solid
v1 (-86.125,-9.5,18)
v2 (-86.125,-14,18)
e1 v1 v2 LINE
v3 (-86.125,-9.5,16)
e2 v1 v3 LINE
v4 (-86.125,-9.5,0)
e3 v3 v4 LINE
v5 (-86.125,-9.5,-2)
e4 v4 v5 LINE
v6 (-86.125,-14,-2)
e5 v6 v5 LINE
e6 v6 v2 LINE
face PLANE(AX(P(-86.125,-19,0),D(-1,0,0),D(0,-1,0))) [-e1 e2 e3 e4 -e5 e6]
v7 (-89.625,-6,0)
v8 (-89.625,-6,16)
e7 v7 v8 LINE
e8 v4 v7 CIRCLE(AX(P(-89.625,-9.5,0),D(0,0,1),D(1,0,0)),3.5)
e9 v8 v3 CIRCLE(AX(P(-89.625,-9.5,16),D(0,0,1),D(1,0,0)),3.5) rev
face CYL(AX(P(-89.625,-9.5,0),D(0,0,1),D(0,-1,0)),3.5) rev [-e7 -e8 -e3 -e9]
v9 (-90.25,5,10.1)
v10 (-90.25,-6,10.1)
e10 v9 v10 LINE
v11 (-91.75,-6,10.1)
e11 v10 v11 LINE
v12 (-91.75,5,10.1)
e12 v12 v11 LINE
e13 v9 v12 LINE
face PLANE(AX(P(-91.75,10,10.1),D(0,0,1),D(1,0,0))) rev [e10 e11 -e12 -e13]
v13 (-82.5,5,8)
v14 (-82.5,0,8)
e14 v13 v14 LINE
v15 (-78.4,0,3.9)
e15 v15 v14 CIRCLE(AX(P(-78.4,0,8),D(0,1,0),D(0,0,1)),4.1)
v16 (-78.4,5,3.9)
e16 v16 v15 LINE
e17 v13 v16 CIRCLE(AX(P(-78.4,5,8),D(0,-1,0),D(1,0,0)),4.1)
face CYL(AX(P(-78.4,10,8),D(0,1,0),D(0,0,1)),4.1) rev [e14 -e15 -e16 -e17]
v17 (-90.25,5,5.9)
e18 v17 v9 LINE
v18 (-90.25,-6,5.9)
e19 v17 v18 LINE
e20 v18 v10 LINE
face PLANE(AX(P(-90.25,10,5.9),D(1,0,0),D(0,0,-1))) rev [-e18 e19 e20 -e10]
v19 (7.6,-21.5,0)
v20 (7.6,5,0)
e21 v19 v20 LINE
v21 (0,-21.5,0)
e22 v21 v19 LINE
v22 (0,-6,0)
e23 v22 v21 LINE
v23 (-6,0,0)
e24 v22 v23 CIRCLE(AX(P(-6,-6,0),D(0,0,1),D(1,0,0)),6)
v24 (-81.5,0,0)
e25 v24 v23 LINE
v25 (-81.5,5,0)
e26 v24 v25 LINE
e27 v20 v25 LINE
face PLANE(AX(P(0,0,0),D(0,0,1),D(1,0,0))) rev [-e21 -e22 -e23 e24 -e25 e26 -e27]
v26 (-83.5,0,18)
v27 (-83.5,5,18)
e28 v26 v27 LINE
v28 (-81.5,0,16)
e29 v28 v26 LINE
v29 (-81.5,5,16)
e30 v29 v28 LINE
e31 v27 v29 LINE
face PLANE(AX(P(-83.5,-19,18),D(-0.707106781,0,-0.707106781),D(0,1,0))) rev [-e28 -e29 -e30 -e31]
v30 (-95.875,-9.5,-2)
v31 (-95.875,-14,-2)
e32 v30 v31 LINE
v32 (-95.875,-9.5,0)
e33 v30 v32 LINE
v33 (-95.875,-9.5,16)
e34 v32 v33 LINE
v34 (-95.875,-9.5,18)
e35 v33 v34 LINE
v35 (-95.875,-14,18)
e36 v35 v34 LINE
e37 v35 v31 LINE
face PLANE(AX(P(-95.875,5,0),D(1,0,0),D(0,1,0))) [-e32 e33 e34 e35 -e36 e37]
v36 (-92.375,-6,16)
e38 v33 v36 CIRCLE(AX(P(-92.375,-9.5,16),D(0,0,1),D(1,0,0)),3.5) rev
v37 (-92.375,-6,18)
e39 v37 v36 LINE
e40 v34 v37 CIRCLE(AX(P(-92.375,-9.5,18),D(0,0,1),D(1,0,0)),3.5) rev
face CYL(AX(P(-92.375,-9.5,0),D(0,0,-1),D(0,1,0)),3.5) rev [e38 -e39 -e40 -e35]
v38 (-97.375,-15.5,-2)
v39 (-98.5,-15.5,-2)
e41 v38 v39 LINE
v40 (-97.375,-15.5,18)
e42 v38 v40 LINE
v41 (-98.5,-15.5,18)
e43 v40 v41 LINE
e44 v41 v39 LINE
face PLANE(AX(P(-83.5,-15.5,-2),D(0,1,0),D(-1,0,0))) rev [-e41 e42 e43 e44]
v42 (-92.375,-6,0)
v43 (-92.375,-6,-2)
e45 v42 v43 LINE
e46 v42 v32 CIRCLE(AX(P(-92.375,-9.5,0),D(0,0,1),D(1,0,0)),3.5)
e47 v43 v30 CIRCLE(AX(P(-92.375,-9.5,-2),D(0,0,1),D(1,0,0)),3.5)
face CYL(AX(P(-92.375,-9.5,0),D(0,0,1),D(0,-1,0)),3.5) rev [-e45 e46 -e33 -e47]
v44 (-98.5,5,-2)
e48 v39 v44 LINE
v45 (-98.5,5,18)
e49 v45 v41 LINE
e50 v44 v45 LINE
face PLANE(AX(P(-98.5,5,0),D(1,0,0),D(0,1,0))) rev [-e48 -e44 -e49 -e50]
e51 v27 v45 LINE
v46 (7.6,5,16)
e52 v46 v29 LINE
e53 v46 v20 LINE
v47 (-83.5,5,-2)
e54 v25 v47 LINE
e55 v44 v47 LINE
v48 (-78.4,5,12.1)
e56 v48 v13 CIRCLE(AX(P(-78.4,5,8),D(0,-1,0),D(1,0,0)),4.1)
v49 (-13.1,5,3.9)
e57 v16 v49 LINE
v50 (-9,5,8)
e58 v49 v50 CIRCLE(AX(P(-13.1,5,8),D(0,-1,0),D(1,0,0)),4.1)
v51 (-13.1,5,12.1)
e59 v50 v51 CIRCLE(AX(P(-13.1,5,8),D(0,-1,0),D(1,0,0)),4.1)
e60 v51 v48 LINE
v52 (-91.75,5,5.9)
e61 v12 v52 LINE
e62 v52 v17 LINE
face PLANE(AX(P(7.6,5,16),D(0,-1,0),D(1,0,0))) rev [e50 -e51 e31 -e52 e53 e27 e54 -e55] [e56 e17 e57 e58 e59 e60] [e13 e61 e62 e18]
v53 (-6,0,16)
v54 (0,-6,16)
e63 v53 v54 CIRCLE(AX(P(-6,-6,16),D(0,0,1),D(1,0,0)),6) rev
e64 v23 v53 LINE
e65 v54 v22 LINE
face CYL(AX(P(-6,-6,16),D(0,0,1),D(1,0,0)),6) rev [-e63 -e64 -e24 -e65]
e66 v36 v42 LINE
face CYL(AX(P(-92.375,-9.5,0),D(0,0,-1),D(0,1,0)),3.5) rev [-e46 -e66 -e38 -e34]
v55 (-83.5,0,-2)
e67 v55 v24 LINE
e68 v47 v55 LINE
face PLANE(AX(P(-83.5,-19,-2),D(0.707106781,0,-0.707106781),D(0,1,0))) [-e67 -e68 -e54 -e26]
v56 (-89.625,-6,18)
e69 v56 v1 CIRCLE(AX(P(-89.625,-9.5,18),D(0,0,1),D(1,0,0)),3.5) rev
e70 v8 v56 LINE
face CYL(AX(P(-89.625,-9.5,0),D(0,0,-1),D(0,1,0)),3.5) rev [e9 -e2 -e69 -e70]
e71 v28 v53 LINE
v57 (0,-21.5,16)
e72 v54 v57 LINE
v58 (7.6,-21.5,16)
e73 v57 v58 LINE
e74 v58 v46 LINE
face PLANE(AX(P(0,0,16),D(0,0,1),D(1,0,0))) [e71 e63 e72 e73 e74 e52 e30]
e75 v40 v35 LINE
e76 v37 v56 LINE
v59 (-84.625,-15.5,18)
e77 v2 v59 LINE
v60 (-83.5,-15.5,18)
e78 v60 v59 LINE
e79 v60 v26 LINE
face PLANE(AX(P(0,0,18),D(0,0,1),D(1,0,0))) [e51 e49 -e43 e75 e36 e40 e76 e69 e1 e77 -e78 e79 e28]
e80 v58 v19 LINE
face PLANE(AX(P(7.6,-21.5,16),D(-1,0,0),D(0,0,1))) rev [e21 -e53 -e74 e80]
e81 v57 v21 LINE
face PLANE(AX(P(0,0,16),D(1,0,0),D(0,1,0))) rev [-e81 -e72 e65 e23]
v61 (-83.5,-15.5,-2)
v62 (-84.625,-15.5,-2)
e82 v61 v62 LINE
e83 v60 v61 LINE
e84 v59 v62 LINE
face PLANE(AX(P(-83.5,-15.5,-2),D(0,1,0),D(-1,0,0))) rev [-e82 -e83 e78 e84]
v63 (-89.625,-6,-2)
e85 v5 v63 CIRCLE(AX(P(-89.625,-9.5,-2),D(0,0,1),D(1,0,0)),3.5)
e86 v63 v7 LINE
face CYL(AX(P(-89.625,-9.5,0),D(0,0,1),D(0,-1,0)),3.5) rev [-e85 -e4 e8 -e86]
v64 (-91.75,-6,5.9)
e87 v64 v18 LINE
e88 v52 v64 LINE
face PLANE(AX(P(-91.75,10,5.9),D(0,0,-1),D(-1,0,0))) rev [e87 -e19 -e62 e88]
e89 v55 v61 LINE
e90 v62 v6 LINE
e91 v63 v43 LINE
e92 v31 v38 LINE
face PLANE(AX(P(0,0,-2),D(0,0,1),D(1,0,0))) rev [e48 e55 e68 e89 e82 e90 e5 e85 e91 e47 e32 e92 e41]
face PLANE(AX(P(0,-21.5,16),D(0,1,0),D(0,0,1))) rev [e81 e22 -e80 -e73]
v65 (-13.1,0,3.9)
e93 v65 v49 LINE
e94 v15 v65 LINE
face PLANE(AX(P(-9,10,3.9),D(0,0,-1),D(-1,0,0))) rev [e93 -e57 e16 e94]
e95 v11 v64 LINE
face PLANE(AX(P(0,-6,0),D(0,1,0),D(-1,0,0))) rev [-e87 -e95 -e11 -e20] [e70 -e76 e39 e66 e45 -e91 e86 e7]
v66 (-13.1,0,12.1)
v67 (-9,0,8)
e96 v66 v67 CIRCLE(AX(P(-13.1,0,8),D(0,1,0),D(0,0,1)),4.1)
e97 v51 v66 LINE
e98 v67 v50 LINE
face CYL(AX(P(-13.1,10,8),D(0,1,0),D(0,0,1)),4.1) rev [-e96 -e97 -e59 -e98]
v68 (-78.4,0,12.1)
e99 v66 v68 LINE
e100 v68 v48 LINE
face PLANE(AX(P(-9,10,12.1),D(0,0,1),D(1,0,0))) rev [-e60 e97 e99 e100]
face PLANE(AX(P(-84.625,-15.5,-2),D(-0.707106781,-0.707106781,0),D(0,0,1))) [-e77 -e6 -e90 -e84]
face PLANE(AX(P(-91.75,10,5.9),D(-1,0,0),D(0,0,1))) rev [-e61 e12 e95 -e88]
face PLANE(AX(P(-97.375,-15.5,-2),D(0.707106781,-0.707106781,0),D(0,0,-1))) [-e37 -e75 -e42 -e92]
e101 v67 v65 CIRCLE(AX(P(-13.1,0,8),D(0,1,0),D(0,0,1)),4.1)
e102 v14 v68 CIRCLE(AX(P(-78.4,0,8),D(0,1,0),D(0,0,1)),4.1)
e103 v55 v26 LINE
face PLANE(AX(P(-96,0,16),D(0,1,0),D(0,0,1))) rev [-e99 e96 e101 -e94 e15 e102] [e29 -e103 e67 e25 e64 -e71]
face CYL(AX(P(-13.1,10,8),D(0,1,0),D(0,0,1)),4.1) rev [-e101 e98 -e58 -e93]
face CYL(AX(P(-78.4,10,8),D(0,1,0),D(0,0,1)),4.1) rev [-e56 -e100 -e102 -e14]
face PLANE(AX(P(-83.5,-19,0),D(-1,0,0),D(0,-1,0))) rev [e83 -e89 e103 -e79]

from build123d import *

# Parameters (mm, degrees)
EXTRUDE_1_DEPTH      = 16
SKETCH_4_W           = 1.5
SKETCH_4_H           = 4.2
SKETCH_4_W_2         = 73.5
SKETCH_4_H_2         = 8.2
CUT_EXTRUDE_1_DEPTH  = 10
FILLET_1_R           = 4.1
SKETCH_6_W           = 10
SKETCH_6_H           = 16
SKETCH_6_W_2         = 1.5
SKETCH_6_H_2         = 4.2
EXTRUDE_4_DEPTH      = 11
EXTRUDE_6_DEPTH      = 13
EXTRUDE_6_DEPTH_BACK = 11
SKETCH_10_W          = 0.125
SKETCH_10_H          = 16
SKETCH_10_W_2        = 2.5
FILLET_2_R           = 3.5
FILLET_3_R           = 6
EXTRUDE_7_DEPTH      = 2
EXTRUDE_8_DEPTH      = 2
FILLET_4_R           = 3.5
CUT_EXTRUDE_START    = -15
SKETCH_13_W          = 20
SKETCH_13_H          = 3.5
CUT_EXTRUDE_2_DEPTH  = 15
CHAMFER_1_SIZE       = 2
CHAMFER_2_SIZE       = 1.5


with BuildPart() as part:
    # 스케치1 → 보스-돌출1 (new body)
    with BuildSketch(Plane.XY):
        Polygon((-96, 0), (0, 0), (0, -21.5), (7.6, -21.5), (7.6, 5), (-96, 5), align=None)
    extrude(amount=EXTRUDE_1_DEPTH)

    # 스케치4 → 컷-돌출1 (cut)
    with BuildSketch(Plane.XZ):
        with Locations((-91, 8)):
            Rectangle(SKETCH_4_W, SKETCH_4_H)
        with Locations((-45.75, 8)):
            Rectangle(SKETCH_4_W_2, SKETCH_4_H_2)
    extrude(amount=-CUT_EXTRUDE_1_DEPTH, mode=Mode.SUBTRACT)

    # 필렛1
    fillet_1_edges = [part.edges().sort_by_distance(p)[0] for p in [
        (-82.5, 2.5, 3.9),
        (-82.5, 2.5, 12.1),
        (-9, 2.5, 3.9),
        (-9, 2.5, 12.1),
    ]]
    fillet(fillet_1_edges, radius=FILLET_1_R - 0.0001)  # a hair under: the kernel refuses the full size

    # 스케치6 → 보스-돌출4 (add)
    with BuildSketch(Plane(origin=(0, 5, 0), x_dir=(1, 0, 0), z_dir=(0, 1, 0))):
        with Locations((-91, -8)):
            Rectangle(SKETCH_6_W, SKETCH_6_H)
        with Locations((-91, -8)):
            Rectangle(SKETCH_6_W_2, SKETCH_6_H_2, mode=Mode.SUBTRACT)
    extrude(amount=-EXTRUDE_4_DEPTH)

    # 스케치10 → 보스-돌출6 (add, two sides: drawn at the far end of the back side and taken through both)
    with BuildSketch(Plane.XZ.offset(6).offset(-EXTRUDE_6_DEPTH_BACK)):
        with Locations((-95.9375, 8)):
            Rectangle(SKETCH_10_W, SKETCH_10_H)
        with Locations((-97.25, 8)):
            Rectangle(SKETCH_10_W_2, SKETCH_10_H)
        with Locations((-86.0625, 8)):
            Rectangle(SKETCH_10_W, SKETCH_10_H)
        with Locations((-84.75, 8)):
            Rectangle(SKETCH_10_W_2, SKETCH_10_H)
    extrude(amount=EXTRUDE_6_DEPTH + EXTRUDE_6_DEPTH_BACK)

    # 필렛2
    fillet_2_edges = [part.edges().sort_by_distance(p)[0] for p in [
        (-95.875, -6, 8),
        (-86.125, -6, 8),
    ]]
    fillet(fillet_2_edges, radius=FILLET_2_R)

    # 필렛3
    fillet_3_edges = [part.edges().sort_by_distance(p)[0] for p in [
        (0, 0, 8),
    ]]
    fillet(fillet_3_edges, radius=FILLET_3_R)

    # 스케치11 → 보스-돌출7 (add)
    with BuildSketch(Plane.XY.offset(16)):
        Polygon((-98.5, 5), (-98.5, -19), (-95.875, -19), (-95.875, -6), (-86.125, -6), (-86.125, -19), (-83.5, -19), (-83.5, 5), align=None)
    extrude(amount=EXTRUDE_7_DEPTH)

    # 스케치12 → 보스-돌출8 (add)
    with BuildSketch(Plane(origin=(0, 0, 0), x_dir=(-1, 0, 0), z_dir=(0, 0, -1))):
        Polygon((83.5, 5), (83.5, -19), (86.125, -19), (86.125, -6), (95.875, -6), (95.875, -19), (98.5, -19), (98.5, 5), align=None)
    extrude(amount=EXTRUDE_8_DEPTH)

    # 필렛4
    fillet_4_edges = [part.edges().sort_by_distance(p)[0] for p in [
        (-95.875, -6, -1),
        (-86.125, -6, -1),
        (-86.125, -6, 17),
        (-95.875, -6, 17),
    ]]
    fillet(fillet_4_edges, radius=FILLET_4_R)

    # 스케치13 → 컷-돌출2 (cut)
    with BuildSketch(Plane.ZY.offset(98.5).offset(CUT_EXTRUDE_START)):
        with Locations((8, -17.25)):
            Rectangle(SKETCH_13_W, SKETCH_13_H)
    extrude(amount=CUT_EXTRUDE_2_DEPTH, mode=Mode.SUBTRACT)

    # 모따기1
    chamfer_1_edges = [part.edges().sort_by_distance(p)[0] for p in [
        (-83.5, 2.5, 16),
        (-83.5, 2.5, 0),
    ]]
    chamfer(chamfer_1_edges, length=CHAMFER_1_SIZE - 0.0001)  # a hair under: the kernel refuses the full size

    # 모따기2
    chamfer_2_edges = [part.edges().sort_by_distance(p)[0] for p in [
        (-95.875, -15.5, 8),
        (-86.125, -15.5, 8),
    ]]
    chamfer(chamfer_2_edges, length=CHAMFER_2_SIZE)


solid = part.part
